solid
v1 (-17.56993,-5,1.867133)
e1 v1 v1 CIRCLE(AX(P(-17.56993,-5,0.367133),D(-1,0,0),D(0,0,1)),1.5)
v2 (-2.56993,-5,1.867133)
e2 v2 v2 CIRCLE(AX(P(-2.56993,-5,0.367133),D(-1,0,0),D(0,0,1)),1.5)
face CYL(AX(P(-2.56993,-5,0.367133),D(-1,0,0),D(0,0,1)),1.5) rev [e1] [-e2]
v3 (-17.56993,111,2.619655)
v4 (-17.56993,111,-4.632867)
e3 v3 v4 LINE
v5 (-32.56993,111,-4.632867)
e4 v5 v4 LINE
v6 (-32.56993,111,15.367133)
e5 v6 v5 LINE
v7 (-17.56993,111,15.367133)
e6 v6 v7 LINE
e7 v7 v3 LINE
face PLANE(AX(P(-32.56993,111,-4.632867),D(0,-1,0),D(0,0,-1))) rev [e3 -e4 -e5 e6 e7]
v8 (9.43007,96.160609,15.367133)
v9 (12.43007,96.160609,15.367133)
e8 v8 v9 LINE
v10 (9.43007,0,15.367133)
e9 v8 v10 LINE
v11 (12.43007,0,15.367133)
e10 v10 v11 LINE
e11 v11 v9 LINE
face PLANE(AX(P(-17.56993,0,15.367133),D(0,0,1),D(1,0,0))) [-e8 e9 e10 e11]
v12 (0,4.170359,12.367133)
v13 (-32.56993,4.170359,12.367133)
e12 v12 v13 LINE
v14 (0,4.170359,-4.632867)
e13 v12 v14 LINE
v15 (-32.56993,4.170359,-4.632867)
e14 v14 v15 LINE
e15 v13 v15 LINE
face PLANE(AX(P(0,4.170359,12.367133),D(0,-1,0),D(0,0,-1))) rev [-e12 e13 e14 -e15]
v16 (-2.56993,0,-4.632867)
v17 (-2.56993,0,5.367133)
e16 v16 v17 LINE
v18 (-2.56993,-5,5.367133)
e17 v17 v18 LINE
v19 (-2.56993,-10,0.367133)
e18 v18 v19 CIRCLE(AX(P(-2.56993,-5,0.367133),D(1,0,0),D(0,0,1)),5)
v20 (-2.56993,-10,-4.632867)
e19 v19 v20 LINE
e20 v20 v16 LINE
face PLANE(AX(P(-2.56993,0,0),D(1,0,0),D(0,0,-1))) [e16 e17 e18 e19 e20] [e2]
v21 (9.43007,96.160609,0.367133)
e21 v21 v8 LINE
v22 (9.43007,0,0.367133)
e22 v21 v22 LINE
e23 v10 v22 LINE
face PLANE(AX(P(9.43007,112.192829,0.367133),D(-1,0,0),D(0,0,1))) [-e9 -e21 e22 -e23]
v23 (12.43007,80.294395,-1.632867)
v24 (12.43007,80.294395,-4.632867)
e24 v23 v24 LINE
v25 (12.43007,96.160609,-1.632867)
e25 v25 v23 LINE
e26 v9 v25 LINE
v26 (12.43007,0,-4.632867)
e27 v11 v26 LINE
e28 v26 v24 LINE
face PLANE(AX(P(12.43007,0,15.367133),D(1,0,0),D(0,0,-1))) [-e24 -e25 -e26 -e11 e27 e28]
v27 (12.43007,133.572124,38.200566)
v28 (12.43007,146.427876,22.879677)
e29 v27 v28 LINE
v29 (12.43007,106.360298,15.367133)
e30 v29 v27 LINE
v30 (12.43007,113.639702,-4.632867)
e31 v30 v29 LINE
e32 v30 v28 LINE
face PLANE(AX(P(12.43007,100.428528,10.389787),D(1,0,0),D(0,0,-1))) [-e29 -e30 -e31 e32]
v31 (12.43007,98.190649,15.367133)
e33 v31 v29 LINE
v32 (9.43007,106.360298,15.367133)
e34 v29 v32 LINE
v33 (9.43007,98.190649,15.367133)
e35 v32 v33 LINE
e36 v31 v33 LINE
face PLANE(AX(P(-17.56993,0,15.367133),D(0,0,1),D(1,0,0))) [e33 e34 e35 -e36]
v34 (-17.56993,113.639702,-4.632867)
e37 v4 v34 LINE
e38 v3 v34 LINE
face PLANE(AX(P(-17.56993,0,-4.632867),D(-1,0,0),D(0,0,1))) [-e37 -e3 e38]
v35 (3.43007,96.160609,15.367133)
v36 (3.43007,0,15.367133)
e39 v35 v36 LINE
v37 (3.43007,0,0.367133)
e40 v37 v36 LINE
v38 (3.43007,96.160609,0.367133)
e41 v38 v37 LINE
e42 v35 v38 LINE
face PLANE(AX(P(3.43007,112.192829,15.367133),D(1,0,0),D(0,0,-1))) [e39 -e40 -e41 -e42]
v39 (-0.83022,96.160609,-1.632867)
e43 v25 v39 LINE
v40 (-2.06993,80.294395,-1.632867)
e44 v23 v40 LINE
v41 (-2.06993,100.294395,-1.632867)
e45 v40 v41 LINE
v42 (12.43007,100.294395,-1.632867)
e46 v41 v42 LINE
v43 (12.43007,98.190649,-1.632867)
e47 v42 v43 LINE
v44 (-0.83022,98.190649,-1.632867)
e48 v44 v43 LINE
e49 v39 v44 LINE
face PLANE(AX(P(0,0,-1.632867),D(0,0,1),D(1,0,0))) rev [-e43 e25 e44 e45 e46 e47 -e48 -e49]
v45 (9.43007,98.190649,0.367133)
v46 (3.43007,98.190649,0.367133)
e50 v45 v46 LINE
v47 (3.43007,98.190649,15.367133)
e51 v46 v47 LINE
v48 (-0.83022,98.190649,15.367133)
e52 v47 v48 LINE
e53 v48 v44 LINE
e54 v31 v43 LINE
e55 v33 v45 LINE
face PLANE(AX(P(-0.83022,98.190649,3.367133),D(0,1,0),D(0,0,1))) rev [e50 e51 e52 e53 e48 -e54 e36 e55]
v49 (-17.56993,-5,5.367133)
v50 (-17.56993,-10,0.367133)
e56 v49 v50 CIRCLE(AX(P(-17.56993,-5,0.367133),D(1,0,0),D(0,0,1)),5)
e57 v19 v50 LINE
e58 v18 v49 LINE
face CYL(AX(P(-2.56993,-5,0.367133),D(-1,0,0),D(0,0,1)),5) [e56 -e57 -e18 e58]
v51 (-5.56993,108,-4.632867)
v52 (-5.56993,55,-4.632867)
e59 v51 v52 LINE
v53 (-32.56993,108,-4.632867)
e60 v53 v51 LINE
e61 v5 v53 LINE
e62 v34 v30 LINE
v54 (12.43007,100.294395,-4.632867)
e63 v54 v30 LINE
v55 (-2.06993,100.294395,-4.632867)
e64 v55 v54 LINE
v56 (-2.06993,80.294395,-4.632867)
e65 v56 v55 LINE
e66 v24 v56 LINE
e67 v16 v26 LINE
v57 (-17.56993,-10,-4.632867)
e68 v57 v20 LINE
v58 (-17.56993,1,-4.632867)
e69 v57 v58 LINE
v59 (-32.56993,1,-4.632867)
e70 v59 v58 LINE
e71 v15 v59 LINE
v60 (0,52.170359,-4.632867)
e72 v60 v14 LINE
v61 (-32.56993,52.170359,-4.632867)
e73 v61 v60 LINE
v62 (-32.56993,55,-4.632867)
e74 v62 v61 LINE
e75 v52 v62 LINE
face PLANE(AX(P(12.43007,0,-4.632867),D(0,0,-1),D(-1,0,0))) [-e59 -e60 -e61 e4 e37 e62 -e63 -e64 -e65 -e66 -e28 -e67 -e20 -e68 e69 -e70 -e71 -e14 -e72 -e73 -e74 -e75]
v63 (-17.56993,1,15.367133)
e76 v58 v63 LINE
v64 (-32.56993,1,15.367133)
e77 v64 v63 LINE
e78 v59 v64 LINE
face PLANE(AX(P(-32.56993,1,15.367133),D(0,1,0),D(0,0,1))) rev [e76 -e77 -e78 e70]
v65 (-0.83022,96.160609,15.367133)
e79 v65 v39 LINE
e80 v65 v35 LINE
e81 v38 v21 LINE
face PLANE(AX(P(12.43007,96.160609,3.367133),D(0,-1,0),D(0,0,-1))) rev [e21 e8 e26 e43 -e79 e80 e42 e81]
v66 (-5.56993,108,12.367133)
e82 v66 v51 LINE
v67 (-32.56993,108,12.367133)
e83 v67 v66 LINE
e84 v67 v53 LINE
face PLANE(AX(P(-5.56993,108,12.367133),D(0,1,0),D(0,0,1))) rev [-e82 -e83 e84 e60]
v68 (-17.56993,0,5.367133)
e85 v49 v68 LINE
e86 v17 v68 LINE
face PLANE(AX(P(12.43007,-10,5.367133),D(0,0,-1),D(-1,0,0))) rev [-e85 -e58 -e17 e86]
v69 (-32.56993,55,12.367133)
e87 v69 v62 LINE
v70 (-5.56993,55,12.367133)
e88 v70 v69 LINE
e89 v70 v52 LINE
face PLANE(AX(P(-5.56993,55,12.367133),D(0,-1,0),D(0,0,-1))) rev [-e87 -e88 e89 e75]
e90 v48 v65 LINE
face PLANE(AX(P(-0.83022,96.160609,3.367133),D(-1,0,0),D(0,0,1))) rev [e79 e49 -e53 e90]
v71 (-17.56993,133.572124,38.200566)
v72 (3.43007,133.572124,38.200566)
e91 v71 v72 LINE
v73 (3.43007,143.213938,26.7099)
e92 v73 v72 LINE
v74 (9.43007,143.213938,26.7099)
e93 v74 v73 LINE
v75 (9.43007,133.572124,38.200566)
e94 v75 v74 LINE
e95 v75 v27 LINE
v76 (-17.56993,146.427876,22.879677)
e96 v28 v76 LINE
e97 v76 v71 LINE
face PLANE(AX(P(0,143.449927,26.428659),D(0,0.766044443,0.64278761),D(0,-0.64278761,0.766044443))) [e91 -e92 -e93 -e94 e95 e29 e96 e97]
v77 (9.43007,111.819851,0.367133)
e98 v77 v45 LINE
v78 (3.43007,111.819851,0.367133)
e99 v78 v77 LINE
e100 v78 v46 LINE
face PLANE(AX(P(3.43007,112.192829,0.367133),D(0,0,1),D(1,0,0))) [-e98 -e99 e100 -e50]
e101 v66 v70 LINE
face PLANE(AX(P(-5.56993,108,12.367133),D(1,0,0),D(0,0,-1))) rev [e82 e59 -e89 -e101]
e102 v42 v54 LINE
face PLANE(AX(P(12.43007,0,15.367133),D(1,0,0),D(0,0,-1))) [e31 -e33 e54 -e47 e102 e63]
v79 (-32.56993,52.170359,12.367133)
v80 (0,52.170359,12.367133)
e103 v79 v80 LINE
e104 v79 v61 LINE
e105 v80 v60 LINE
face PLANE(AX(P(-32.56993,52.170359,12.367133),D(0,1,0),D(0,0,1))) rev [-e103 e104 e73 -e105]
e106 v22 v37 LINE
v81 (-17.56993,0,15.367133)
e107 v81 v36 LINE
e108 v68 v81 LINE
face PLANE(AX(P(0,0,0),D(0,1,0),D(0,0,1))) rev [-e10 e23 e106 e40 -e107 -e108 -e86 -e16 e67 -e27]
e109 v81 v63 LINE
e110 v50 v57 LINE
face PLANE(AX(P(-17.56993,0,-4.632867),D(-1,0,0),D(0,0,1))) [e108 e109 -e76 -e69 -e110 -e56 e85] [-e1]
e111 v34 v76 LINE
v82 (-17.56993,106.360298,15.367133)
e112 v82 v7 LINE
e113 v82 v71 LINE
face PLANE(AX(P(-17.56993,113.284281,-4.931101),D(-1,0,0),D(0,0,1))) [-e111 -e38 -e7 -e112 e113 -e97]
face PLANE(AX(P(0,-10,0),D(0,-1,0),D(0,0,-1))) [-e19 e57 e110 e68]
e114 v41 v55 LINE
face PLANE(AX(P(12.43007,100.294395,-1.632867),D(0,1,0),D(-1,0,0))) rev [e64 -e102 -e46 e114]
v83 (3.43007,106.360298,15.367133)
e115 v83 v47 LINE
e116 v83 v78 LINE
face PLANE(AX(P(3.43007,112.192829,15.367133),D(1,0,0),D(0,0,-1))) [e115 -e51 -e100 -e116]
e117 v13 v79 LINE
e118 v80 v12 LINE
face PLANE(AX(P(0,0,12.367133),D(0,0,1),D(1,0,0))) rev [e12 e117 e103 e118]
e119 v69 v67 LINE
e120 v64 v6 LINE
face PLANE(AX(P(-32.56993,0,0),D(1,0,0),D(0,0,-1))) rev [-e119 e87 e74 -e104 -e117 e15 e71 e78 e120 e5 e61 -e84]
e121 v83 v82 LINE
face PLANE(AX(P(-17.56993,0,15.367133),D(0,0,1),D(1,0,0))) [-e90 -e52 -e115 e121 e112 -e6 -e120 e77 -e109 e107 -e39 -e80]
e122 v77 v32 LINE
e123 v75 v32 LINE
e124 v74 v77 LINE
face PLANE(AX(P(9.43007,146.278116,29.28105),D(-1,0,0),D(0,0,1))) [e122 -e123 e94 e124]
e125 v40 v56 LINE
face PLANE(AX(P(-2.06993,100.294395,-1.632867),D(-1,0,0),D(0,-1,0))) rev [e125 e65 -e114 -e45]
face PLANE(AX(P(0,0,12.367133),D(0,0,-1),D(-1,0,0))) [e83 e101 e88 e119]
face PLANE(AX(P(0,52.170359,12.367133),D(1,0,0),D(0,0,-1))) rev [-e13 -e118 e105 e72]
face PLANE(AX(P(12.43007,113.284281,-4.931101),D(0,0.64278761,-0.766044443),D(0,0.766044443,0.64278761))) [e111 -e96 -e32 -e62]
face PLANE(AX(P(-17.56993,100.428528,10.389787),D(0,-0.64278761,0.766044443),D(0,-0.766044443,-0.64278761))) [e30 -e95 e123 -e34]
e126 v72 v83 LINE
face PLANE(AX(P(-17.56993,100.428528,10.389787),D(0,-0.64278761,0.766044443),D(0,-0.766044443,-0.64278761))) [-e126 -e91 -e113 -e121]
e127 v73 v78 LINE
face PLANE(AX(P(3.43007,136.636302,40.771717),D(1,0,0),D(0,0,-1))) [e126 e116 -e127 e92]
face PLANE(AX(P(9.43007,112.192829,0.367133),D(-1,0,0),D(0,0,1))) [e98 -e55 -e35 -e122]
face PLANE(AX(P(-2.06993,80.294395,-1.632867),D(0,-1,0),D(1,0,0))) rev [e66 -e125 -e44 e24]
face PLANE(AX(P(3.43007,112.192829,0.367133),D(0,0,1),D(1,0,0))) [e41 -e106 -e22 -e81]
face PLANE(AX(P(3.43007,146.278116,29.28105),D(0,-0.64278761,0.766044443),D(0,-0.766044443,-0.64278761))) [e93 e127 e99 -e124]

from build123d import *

# Parameters (mm, degrees)
SKETCH_1_W                = 30
SKETCH_1_H                = 20
SKETCH_3_W                = 30
SKETCH_3_H                = 10
EXTRUDE_2_DEPTH           = 10
SKETCH_4_W                = 10
SKETCH_4_H                = 10
CUT_EXTRUDE_1_DEPTH       = 15
CUT_EXTRUDE_2_DEPTH       = 15
SKETCH_6_R                = 1.5
CUT_EXTRUDE_3_DEPTH       = 15
SKETCH_8_W                = 6
SKETCH_8_H                = 15
SKETCH_12_W               = 20
SKETCH_12_H               = 110
EXTRUDE_3_DEPTH           = 15
SKETCH_14_W               = 27
SKETCH_14_H               = 53
SKETCH_14_W_2             = 32.56993007
SKETCH_14_H_2             = 48
CUT_EXTRUDE_6_DEPTH       = 17
SKETCH_18_W               = 14.5
SKETCH_18_H               = 20
CUT_EXTRUDE_7_DEPTH       = 3
SKETCH_19_W               = 13.260290085
SKETCH_19_H               = 2.030039981
CUT_EXTRUDE_8_DEPTH       = 5
CUT_EXTRUDE_START         = 96.160609199
CUT_EXTRUDE_9_OUTLINE_W   = 4.260290085
CUT_EXTRUDE_9_OUTLINE_H   = 12
CUT_EXTRUDE_9_OUTLINE_W_2 = 3
CUT_EXTRUDE_9_DEPTH       = 2.030039981


# Read off the part's stored shape, not the designer's step: 切除-拉伸9
with BuildPart() as part:
    # Sweep 1: sweep along a path in 草图2
    with BuildLine(Plane(origin=(-2.57, 0, 0), x_dir=(0, 0, -1), z_dir=(1, 0, 0))) as sweep_1_path:
        Line((-5.367132867, 0), (-5.367132867, 110))
        Line((-5.367132867, 110), (-30.540121802, 140))
    # 草图1 → Sweep 1 (sweep)
    with BuildSketch(Plane(origin=(0, 0, 0), x_dir=(1, 0, 0), z_dir=(0, 1, 0))):
        with Locations((-2.56993007, -5.367132867)):
            Rectangle(SKETCH_1_W, SKETCH_1_H)
    sweep(path=sweep_1_path.line, transition=Transition.RIGHT)

    # 草图3 → 凸台-拉伸2 (add)
    with BuildSketch(Plane.XZ):
        with Locations((-2.56993007, 0.367132867)):
            Rectangle(SKETCH_3_W, SKETCH_3_H)
    extrude(amount=EXTRUDE_2_DEPTH)

    # 草图4 → 切除-拉伸1 (cut)
    with BuildSketch(Plane(origin=(12.43006993, 0, 0), x_dir=(0, 0, -1), z_dir=(1, 0, 0))):
        with Locations((-0.367132867, -5)):
            Rectangle(SKETCH_4_W, SKETCH_4_H)
    extrude(amount=-CUT_EXTRUDE_1_DEPTH, mode=Mode.SUBTRACT)

    # 草图5 → 切除-拉伸2 (cut)
    with BuildSketch(Plane.ZY.offset(17.56993007)):
        with BuildLine():
            Line((5.367132867, -10), (0.367132867, -10))
            ThreePointArc((0.367132867, -10), (3.902666773, -8.535533906), (5.367132867, -5))
            Line((5.367132867, -5), (5.367132867, -10))
        make_face()
    extrude(amount=-CUT_EXTRUDE_2_DEPTH, mode=Mode.SUBTRACT)

    # 草图6 → 切除-拉伸3 (cut)
    with BuildSketch(Plane.ZY.offset(17.56993007)):
        with Locations((0.367132867, -5)):
            Circle(SKETCH_6_R)
    extrude(amount=-CUT_EXTRUDE_3_DEPTH, mode=Mode.SUBTRACT)

    # Sweep 1 2: sweep along a path in 草图10
    with BuildLine(Plane(origin=(6.43006993, 0, 0), x_dir=(0, 0, -1), z_dir=(1, 0, 0))) as sweep_1_2_path:
        Line((-32.45523291, 138.393030976), (-7.867132867, 109.090074414))
        Line((-7.867132867, 109.090074414), (-7.867132867, 0))
    # 草图8 → Sweep 1 2 (sweep, cut)
    with BuildSketch(Plane(origin=(0, 97.193446801, 81.554985364), x_dir=(1, 0, 0), z_dir=(0, 0.7660444431189773, 0.6427876096865403))):
        with Locations((6.43006993, 64.095174757)):
            Rectangle(SKETCH_8_W, SKETCH_8_H)
    sweep(path=sweep_1_2_path.line, transition=Transition.RIGHT, mode=Mode.SUBTRACT)

    # 草图12 → 凸台-拉伸3 (add)
    with BuildSketch(Plane.ZY.offset(17.56993007)):
        with Locations((5.367132867, 56)):
            Rectangle(SKETCH_12_W, SKETCH_12_H)
    extrude(amount=EXTRUDE_3_DEPTH)

    # 草图14 → 切除-拉伸6 (cut)
    with BuildSketch(Plane(origin=(0, 0, -4.632867133), x_dir=(-1, 0, 0), z_dir=(0, 0, -1))):
        with Locations((19.06993007, 81.5)):
            Rectangle(SKETCH_14_W, SKETCH_14_H)
        with Locations((16.284965035, 28.17035924)):
            Rectangle(SKETCH_14_W_2, SKETCH_14_H_2)
    extrude(amount=-CUT_EXTRUDE_6_DEPTH, mode=Mode.SUBTRACT)

    # 草图18 → 切除-拉伸7 (cut)
    with BuildSketch(Plane(origin=(0, 0, -4.632867133), x_dir=(-1, 0, 0), z_dir=(0, 0, -1))):
        with Locations((-5.18006993, 90.294394936)):
            Rectangle(SKETCH_18_W, SKETCH_18_H)
    extrude(amount=-CUT_EXTRUDE_7_DEPTH, mode=Mode.SUBTRACT)

    # 草图19 → 切除-拉伸8 (cut)
    with BuildSketch(Plane(origin=(0, 0, -1.632867133), x_dir=(-1, 0, 0), z_dir=(0, 0, -1))):
        with Locations((-5.799924888, 97.17562919)):
            Rectangle(SKETCH_19_W, SKETCH_19_H)
    extrude(amount=-CUT_EXTRUDE_8_DEPTH, mode=Mode.SUBTRACT)

    # 切除-拉伸9 outline → 切除-拉伸9 (cut)
    with BuildSketch(Plane(origin=(0, 0, 0), x_dir=(1, 0, 0), z_dir=(0, 1, 0)).offset(CUT_EXTRUDE_START)):
        with Locations((1.299924888, -9.367132867)):
            Rectangle(CUT_EXTRUDE_9_OUTLINE_W, CUT_EXTRUDE_9_OUTLINE_H)
        with Locations((10.93006993, -9.367132867)):
            Rectangle(CUT_EXTRUDE_9_OUTLINE_W_2, CUT_EXTRUDE_9_OUTLINE_H)
    extrude(amount=CUT_EXTRUDE_9_DEPTH, mode=Mode.SUBTRACT)


solid = part.part
